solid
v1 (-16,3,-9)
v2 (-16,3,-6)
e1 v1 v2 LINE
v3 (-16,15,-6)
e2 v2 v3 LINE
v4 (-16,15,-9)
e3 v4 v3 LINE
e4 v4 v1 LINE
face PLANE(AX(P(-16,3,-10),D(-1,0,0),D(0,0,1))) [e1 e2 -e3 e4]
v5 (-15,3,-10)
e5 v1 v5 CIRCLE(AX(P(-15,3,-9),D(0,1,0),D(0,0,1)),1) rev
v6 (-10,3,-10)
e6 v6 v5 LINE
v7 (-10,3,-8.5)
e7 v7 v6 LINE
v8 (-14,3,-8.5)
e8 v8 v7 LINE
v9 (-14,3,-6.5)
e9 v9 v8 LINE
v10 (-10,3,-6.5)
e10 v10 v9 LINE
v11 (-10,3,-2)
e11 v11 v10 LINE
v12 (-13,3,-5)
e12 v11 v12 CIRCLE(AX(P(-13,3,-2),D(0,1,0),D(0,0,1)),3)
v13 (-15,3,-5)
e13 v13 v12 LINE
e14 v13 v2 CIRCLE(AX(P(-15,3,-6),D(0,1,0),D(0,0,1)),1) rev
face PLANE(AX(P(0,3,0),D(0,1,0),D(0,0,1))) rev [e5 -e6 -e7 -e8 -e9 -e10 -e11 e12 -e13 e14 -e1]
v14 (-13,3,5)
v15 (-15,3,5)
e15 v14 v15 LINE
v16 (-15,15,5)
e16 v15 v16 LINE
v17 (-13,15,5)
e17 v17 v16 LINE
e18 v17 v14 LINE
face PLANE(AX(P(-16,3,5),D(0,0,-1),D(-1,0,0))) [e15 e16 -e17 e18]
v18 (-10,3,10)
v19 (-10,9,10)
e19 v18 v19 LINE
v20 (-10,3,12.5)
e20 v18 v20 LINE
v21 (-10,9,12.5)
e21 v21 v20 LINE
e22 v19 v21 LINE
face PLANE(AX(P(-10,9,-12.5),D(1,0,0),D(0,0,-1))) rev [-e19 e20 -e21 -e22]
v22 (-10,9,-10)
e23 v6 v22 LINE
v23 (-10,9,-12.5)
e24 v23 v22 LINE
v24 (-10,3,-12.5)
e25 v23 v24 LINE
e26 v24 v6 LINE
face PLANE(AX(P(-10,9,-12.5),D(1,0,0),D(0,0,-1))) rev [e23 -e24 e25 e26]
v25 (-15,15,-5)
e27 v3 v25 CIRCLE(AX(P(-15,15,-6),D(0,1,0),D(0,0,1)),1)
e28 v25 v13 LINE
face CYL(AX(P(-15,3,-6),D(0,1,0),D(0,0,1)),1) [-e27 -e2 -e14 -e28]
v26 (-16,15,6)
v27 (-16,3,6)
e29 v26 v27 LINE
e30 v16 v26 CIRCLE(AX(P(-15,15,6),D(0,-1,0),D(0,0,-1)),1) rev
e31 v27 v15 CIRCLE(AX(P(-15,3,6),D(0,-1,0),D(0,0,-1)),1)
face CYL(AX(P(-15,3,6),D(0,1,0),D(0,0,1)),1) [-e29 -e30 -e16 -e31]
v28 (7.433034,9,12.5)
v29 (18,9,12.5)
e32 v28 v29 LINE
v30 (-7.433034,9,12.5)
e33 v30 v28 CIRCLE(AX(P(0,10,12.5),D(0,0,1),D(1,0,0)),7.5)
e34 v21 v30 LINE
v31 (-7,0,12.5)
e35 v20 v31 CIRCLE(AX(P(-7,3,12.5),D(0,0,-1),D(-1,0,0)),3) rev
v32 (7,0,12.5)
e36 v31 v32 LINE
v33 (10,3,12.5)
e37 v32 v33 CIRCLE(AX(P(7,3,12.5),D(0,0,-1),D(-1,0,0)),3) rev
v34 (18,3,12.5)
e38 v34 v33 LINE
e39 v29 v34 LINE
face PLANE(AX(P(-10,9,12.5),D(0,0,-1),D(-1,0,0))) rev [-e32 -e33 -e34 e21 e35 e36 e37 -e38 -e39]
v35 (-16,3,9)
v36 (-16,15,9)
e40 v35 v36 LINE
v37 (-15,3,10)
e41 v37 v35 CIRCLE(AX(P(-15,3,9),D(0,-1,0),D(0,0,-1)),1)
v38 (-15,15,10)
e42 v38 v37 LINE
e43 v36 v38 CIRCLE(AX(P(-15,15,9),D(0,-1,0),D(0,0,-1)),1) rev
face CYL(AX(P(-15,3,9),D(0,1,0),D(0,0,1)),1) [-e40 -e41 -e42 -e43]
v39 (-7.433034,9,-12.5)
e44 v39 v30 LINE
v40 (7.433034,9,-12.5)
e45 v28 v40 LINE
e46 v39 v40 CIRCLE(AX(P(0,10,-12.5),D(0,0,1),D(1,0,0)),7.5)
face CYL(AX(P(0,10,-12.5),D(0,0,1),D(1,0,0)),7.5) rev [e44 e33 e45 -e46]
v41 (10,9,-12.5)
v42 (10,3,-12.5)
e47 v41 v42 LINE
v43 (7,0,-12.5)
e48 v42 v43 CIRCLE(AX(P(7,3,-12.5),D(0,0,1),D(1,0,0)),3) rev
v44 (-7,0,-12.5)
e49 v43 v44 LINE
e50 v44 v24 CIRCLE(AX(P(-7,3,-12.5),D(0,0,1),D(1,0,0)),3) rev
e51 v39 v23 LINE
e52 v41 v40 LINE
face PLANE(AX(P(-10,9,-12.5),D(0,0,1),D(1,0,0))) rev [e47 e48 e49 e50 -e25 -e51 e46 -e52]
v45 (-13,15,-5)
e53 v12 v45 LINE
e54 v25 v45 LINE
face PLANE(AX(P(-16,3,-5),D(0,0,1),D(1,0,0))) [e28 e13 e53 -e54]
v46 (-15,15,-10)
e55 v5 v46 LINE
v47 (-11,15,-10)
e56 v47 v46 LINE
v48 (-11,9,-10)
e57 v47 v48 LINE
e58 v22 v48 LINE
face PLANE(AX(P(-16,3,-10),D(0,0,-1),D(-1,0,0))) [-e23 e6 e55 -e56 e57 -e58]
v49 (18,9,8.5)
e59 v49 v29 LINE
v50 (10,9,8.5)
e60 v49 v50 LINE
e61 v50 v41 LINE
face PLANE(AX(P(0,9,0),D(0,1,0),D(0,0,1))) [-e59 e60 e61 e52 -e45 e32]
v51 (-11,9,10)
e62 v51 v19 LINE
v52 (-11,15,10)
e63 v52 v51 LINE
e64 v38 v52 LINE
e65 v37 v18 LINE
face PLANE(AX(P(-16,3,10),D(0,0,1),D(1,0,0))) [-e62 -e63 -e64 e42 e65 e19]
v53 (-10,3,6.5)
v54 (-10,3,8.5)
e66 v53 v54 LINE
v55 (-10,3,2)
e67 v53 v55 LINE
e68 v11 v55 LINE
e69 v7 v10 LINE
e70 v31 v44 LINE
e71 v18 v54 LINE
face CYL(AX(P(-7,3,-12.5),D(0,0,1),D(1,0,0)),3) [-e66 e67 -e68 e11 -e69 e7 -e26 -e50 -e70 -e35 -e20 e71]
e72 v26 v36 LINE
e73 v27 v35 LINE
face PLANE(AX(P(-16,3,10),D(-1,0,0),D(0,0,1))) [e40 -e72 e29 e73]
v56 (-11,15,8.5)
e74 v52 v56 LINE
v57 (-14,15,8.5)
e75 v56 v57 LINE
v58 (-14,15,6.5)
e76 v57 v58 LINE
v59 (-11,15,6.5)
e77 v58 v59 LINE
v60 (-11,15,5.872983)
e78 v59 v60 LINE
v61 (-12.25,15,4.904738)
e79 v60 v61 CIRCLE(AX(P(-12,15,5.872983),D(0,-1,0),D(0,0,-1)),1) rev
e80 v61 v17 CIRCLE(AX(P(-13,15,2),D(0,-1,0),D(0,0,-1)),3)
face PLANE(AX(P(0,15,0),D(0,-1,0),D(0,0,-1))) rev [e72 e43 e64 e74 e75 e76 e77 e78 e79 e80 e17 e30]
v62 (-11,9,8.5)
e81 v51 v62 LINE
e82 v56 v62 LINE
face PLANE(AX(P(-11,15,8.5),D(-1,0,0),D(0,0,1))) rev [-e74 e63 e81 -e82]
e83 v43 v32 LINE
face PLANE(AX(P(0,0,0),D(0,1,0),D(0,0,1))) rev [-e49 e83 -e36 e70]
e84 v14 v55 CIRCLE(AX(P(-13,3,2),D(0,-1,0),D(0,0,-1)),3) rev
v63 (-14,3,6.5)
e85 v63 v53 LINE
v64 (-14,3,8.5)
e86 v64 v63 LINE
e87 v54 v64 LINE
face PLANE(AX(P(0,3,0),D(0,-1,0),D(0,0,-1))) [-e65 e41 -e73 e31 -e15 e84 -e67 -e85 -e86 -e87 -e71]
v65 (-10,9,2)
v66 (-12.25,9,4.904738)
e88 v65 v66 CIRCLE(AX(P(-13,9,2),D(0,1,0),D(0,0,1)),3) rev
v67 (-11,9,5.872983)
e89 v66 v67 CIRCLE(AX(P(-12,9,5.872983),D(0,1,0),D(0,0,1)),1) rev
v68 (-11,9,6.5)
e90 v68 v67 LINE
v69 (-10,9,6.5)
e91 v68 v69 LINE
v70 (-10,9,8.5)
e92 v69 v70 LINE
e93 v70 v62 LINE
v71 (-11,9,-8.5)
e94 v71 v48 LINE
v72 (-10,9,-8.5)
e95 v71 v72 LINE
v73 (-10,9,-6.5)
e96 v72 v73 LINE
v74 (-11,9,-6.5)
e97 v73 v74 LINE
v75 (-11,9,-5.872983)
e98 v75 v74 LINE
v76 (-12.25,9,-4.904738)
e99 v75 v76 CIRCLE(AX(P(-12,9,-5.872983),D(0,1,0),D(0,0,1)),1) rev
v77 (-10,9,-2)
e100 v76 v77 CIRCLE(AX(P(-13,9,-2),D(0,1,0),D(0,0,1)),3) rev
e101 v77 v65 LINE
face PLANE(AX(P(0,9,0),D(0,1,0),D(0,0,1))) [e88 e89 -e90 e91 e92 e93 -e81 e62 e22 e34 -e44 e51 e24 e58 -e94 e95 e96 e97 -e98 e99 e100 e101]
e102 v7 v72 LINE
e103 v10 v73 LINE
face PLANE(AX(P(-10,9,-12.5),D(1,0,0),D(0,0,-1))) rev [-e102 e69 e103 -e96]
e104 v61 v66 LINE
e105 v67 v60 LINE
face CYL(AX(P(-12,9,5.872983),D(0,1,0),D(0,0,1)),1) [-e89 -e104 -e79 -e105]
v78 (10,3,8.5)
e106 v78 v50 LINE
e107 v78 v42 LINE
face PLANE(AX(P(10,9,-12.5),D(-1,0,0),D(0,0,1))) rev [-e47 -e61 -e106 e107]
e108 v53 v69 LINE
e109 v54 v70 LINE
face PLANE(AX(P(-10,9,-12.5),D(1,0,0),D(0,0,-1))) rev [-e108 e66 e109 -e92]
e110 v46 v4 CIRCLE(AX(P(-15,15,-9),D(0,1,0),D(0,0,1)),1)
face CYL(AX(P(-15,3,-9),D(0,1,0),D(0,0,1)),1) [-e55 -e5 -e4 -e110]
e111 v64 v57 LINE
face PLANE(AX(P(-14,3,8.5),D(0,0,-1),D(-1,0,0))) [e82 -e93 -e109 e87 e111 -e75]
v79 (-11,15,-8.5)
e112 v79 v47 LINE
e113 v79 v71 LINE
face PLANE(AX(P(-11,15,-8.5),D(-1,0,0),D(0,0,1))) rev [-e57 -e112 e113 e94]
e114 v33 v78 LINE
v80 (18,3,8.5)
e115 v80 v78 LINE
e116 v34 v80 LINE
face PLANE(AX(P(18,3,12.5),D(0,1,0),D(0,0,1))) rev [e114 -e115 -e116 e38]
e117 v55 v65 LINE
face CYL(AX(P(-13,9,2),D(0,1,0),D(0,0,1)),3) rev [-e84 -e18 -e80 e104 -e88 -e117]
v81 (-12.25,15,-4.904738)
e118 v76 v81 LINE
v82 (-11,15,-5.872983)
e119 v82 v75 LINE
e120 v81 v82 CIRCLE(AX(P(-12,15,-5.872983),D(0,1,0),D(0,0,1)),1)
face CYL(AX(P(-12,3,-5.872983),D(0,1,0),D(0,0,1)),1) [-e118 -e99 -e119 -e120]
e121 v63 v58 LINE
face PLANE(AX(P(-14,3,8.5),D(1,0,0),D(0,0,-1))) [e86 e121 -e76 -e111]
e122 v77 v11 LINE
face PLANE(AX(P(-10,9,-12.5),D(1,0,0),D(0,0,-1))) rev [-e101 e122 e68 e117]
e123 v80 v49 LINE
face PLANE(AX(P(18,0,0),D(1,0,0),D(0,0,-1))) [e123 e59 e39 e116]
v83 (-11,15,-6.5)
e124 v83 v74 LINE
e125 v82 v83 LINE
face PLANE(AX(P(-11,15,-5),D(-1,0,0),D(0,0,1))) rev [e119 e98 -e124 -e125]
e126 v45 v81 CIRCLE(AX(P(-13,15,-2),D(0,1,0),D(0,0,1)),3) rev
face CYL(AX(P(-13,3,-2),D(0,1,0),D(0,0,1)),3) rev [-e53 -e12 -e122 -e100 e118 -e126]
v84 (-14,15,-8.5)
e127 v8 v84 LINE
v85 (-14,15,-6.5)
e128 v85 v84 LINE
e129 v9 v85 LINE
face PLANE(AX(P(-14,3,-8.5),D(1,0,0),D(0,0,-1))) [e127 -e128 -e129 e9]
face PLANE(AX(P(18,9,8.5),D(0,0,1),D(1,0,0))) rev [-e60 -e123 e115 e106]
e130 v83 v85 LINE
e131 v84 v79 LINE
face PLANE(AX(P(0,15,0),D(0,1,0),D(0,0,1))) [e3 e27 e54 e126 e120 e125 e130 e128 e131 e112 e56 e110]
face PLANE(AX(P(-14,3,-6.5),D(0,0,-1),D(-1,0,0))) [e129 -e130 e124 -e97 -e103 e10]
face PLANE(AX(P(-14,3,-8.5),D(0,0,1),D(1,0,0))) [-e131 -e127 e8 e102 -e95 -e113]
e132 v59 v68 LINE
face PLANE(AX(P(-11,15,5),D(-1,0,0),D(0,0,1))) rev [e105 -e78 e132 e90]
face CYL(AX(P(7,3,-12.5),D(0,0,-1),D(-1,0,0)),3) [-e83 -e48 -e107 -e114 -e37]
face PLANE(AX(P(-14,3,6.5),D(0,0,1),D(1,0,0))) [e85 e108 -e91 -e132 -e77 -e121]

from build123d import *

# Parameters (mm, degrees)
ESBO_O1_W                = 20
ESBO_O1_H                = 25
RESSALTO_EXTRUS_O1_DEPTH = 9
ESBO_O2_R                = 7.5
CORTE_EXTRUS_O1_DEPTH    = 29.390139133
FILETE1_R                = 3
RESSALTO_EXTRUS_O2_DEPTH = 6
RESSALTO_EXTRUS_O3_DEPTH = 6
FILETE3_R                = 1
FILETE5_R                = 3
FILETE6_R                = 1
ESBO_O5_W                = 4
ESBO_O5_H                = 6
RESSALTO_EXTRUS_O4_DEPTH = 8


with BuildPart() as part:
    # Esboço1 → Ressalto-extrusão1 (new body)
    with BuildSketch(Plane(origin=(0, 0, 0), x_dir=(1, 0, 0), z_dir=(0, 1, 0))):
        Rectangle(ESBO_O1_W, ESBO_O1_H)
    extrude(amount=RESSALTO_EXTRUS_O1_DEPTH)

    # Esboço2 → Corte-extrusão1 (cut, through all)
    with BuildSketch(Plane.XY.offset(12.5)):
        with Locations((0, 10)):
            Circle(ESBO_O2_R)
    extrude(amount=-CORTE_EXTRUS_O1_DEPTH, mode=Mode.SUBTRACT)

    # Filete1
    filete1_edges = [part.edges().sort_by_distance(p)[0] for p in [
        (-10, 0, 0),
        (10, 0, 0),
    ]]
    fillet(filete1_edges, radius=FILETE1_R)

    # Esboço3 → Ressalto-extrusão2 (add)
    with BuildSketch(Plane(origin=(0, 9, 0), x_dir=(1, 0, 0), z_dir=(0, 1, 0))):
        Polygon((-16, 10), (-10, 10), (-10, 8.5), (-14, 8.5), (-14, 6.5), (-10, 6.5), (-10, 5), (-16, 5), align=None)
        Polygon((-14, -6.5), (-10, -6.5), (-10, -5), (-16, -5), (-16, -10), (-10, -10), (-10, -8.5), (-14, -8.5), align=None)
    extrude(amount=-RESSALTO_EXTRUS_O2_DEPTH)

    # Esboço4 → Ressalto-extrusão3 (add)
    with BuildSketch(Plane(origin=(0, 9, 0), x_dir=(1, 0, 0), z_dir=(0, 1, 0))):
        Polygon((-16, -10), (-16, -5), (-11, -5), (-11, -6.5), (-14, -6.5), (-14, -8.5), (-11, -8.5), (-11, -10), align=None)
        Polygon((-11, 10), (-16, 10), (-16, 5), (-11, 5), (-11, 6.5), (-14, 6.5), (-14, 8.5), (-11, 8.5), align=None)
    extrude(amount=RESSALTO_EXTRUS_O3_DEPTH)

    # Filete3
    filete3_edges = [part.edges().sort_by_distance(p)[0] for p in [
        (-16, 9, -5),
        (-16, 9, -10),
        (-16, 9, 10),
        (-16, 9, 5),
    ]]
    fillet(filete3_edges, radius=FILETE3_R)

    # Filete5
    # the kernel refuses this fillet: 3 mm, written as the material it adds along each edge
    with BuildSketch(Plane(origin=(-10, 16.5, -5), x_dir=(-1, 0, 0), z_dir=(0, -1, 0))) as filete5_piece_1_section:
        with BuildLine():
            CenterArc((FILETE5_R, -FILETE5_R), FILETE5_R, 90, 90)
            Line((0, -FILETE5_R), (0, 0))
            Line((0, 0), (FILETE5_R, 0))
        make_face()
    filete5_piece_1 = extrude(amount=13.5, mode=Mode.PRIVATE)
    filete5_piece_1 = split(filete5_piece_1, bisect_by=Plane(origin=(-11.589070595, 9, -4.827479681), z_dir=(0, 1, 0)), keep=Keep.TOP, mode=Mode.PRIVATE)
    filete5_piece_1 = split(filete5_piece_1, bisect_by=Plane(origin=(-11, 12, -4.827479681), z_dir=(-1, 0, 0)), keep=Keep.TOP, mode=Mode.PRIVATE)
    filete5_piece_1 = split(filete5_piece_1, bisect_by=Plane(origin=(-11.589070595, 15, -4.827479681), z_dir=(0, -1, 0)), keep=Keep.TOP, mode=Mode.PRIVATE)
    add(filete5_piece_1)
    with BuildSketch(Plane(origin=(-10, 9, -5), x_dir=(-1, 0, 0), z_dir=(0, -1, 0))) as filete5_piece_2_section:
        with BuildLine():
            CenterArc((FILETE5_R, -FILETE5_R), FILETE5_R, 90, 90)
            Line((0, -FILETE5_R), (0, 0))
            Line((0, 0), (FILETE5_R, 0))
        make_face()
    filete5_piece_2 = extrude(amount=6, mode=Mode.PRIVATE)
    filete5_piece_2 = split(filete5_piece_2, bisect_by=Plane(origin=(-11, 6, -4.827479681), z_dir=(-1, 0, 0)), keep=Keep.TOP, mode=Mode.PRIVATE)
    add(filete5_piece_2)
    with BuildSketch(Plane(origin=(-10, 9, -5), x_dir=(-1, 0, 0), z_dir=(0, -1, 0))) as filete5_piece_3_section:
        with BuildLine():
            CenterArc((FILETE5_R, -FILETE5_R), FILETE5_R, 90, 90)
            Line((0, -FILETE5_R), (0, 0))
            Line((0, 0), (FILETE5_R, 0))
        make_face()
    filete5_piece_3 = extrude(amount=6, mode=Mode.PRIVATE)
    filete5_piece_3 = split(filete5_piece_3, bisect_by=Plane(origin=(-11, 6, -4.141402177), z_dir=(1, 0, 0)), keep=Keep.TOP, mode=Mode.PRIVATE)
    add(filete5_piece_3)
    with BuildSketch(Plane(origin=(-10, 16.5, 5), x_dir=(-1, 0, 0), z_dir=(0, -1, 0))) as filete5_piece_4_section:
        with BuildLine():
            CenterArc((FILETE5_R, FILETE5_R), FILETE5_R, 180, 90)
            Line((0, FILETE5_R), (0, 0))
            Line((0, 0), (FILETE5_R, 0))
        make_face()
    filete5_piece_4 = extrude(amount=13.5, mode=Mode.PRIVATE)
    filete5_piece_4 = split(filete5_piece_4, bisect_by=Plane(origin=(-11.589070595, 15, 4.827479681), z_dir=(0, -1, 0)), keep=Keep.TOP, mode=Mode.PRIVATE)
    filete5_piece_4 = split(filete5_piece_4, bisect_by=Plane(origin=(-11.589070595, 9, 4.827479681), z_dir=(0, 1, 0)), keep=Keep.TOP, mode=Mode.PRIVATE)
    filete5_piece_4 = split(filete5_piece_4, bisect_by=Plane(origin=(-11, 12, 4.827479681), z_dir=(-1, 0, 0)), keep=Keep.TOP, mode=Mode.PRIVATE)
    add(filete5_piece_4)
    with BuildSketch(Plane(origin=(-10, 9, 5), x_dir=(-1, 0, 0), z_dir=(0, -1, 0))) as filete5_piece_5_section:
        with BuildLine():
            CenterArc((FILETE5_R, FILETE5_R), FILETE5_R, 180, 90)
            Line((0, FILETE5_R), (0, 0))
            Line((0, 0), (FILETE5_R, 0))
        make_face()
    filete5_piece_5 = extrude(amount=6, mode=Mode.PRIVATE)
    filete5_piece_5 = split(filete5_piece_5, bisect_by=Plane(origin=(-11, 6, 4.827479681), z_dir=(-1, 0, 0)), keep=Keep.TOP, mode=Mode.PRIVATE)
    add(filete5_piece_5)
    with BuildSketch(Plane(origin=(-10, 9, 5), x_dir=(-1, 0, 0), z_dir=(0, -1, 0))) as filete5_piece_6_section:
        with BuildLine():
            CenterArc((FILETE5_R, FILETE5_R), FILETE5_R, 180, 90)
            Line((0, FILETE5_R), (0, 0))
            Line((0, 0), (FILETE5_R, 0))
        make_face()
    filete5_piece_6 = extrude(amount=6, mode=Mode.PRIVATE)
    filete5_piece_6 = split(filete5_piece_6, bisect_by=Plane(origin=(-11, 6, 4.141402177), z_dir=(1, 0, 0)), keep=Keep.TOP, mode=Mode.PRIVATE)
    add(filete5_piece_6)

    # Filete6
    filete6_edges = [part.edges().sort_by_distance(p)[0] for p in [
        (-11, 12, -4.236067977),
        (-11, 12, 4.236067977),
    ]]
    fillet(filete6_edges, radius=FILETE6_R)

    # Esboço5 → Ressalto-extrusão4 (add)
    with BuildSketch(Plane(origin=(10, 0, 0), x_dir=(0, 0, -1), z_dir=(1, 0, 0))):
        with Locations((-10.5, 6)):
            Rectangle(ESBO_O5_W, ESBO_O5_H)
    extrude(amount=RESSALTO_EXTRUS_O4_DEPTH)


solid = part.part
